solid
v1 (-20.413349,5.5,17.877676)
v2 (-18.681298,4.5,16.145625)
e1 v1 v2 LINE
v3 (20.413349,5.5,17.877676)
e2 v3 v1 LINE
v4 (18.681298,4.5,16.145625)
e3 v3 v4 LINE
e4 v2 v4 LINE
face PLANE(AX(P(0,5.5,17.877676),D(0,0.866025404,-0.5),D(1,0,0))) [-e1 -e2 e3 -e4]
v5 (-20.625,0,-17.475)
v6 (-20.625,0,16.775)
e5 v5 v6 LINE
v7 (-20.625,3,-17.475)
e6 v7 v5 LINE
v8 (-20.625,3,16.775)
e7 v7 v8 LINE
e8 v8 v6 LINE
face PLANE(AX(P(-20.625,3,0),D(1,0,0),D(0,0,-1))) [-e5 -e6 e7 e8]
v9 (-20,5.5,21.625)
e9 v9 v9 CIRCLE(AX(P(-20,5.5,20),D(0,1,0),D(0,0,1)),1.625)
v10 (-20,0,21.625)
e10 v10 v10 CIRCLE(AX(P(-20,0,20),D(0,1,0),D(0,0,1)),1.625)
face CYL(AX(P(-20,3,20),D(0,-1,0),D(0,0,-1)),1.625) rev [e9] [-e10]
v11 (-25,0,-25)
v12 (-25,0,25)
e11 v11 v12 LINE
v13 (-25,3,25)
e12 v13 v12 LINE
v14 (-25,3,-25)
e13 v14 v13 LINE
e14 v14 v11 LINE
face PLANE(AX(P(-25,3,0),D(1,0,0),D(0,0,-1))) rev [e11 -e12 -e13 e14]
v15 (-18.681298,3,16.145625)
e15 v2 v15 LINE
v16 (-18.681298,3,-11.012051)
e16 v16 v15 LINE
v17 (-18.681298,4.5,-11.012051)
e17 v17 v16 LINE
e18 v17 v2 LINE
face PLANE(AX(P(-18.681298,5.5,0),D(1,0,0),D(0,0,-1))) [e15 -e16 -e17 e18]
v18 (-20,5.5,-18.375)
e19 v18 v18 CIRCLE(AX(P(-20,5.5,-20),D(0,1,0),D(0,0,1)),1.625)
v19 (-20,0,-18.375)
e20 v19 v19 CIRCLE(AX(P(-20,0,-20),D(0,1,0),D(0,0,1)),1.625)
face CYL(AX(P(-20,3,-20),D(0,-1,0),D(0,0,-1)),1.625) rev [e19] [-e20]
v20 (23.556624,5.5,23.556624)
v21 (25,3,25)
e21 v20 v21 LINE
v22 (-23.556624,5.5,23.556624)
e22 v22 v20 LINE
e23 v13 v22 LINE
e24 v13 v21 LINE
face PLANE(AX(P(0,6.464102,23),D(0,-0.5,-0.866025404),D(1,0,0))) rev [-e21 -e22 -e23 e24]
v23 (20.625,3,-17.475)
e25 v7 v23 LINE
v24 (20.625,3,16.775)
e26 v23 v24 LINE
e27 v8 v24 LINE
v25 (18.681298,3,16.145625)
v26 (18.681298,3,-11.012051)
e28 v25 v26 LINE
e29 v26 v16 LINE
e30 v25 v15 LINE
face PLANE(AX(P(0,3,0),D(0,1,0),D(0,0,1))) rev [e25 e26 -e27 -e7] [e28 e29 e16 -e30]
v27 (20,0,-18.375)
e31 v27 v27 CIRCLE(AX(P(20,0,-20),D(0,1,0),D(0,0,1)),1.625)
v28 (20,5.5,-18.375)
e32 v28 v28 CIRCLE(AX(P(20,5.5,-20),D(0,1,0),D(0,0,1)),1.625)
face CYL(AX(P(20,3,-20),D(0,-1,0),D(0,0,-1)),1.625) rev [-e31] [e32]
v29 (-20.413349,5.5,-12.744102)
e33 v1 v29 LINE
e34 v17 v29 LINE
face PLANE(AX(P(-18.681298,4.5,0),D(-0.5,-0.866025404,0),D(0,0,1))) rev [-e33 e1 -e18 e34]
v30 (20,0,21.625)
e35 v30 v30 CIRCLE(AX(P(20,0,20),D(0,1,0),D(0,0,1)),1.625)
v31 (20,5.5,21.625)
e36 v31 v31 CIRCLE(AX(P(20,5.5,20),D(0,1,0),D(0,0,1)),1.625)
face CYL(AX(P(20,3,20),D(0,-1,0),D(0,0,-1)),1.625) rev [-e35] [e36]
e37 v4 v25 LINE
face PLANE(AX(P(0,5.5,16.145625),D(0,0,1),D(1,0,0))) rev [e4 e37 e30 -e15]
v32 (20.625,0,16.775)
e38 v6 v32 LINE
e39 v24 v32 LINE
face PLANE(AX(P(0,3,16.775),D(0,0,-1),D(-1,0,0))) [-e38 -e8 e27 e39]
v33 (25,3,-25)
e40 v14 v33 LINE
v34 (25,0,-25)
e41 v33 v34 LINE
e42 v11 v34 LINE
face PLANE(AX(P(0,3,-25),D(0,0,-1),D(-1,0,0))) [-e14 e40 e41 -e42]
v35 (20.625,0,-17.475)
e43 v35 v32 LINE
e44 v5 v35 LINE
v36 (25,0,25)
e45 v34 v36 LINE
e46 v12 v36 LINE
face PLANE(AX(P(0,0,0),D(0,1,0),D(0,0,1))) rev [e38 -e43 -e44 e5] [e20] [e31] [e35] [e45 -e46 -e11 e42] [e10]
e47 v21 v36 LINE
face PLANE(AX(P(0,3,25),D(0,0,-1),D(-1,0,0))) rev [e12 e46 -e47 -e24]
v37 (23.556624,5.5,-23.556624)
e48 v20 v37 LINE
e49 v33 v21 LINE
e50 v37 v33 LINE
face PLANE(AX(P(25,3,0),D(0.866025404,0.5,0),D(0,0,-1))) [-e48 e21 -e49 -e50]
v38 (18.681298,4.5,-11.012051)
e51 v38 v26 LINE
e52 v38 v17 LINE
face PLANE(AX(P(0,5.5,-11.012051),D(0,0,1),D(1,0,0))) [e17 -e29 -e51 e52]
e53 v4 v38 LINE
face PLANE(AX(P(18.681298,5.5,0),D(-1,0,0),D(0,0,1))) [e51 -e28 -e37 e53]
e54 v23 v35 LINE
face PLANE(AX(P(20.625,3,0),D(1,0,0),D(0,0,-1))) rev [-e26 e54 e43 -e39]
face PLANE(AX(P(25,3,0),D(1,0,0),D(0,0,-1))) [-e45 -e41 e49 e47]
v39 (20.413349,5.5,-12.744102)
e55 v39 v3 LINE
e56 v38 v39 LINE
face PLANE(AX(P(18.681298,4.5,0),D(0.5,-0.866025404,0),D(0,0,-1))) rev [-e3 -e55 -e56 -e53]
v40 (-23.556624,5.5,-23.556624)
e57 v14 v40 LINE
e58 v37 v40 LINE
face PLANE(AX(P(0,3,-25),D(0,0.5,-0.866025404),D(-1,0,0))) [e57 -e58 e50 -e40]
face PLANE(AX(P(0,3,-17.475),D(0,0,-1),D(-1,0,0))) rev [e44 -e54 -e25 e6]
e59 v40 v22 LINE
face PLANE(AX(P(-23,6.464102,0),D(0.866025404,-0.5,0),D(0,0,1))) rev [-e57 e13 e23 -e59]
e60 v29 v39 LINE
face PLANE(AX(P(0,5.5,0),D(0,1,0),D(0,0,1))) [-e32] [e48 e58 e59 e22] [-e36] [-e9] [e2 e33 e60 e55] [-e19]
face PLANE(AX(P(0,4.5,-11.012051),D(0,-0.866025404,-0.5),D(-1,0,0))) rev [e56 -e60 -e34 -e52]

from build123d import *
from OCP.BRepFilletAPI import BRepFilletAPI_MakeChamfer

# Parameters (mm, degrees)
SKETCH1_W           = 50
SKETCH1_H           = 50
SKETCH1_W_2         = 46
SKETCH1_H_2         = 46
SKETCH1_R           = 1.625
SKETCH1_W_3         = 41.25
SKETCH1_H_3         = 34.25
BOSS_EXTRUDE1_DEPTH = 3
BOSS_EXTRUDE2_START = 3
SKETCH1_3_W         = 46
SKETCH1_3_H         = 46
SKETCH1_3_R         = 1.625
SKETCH1_3_W_2       = 41.25
SKETCH1_3_H_2       = 34.25
SKETCH1_3_W_3       = 37.362596296
SKETCH1_3_H_3       = 27.15767644
BOSS_EXTRUDE2_DEPTH = 2.5
CHAMFER1_SIZE       = 2
CHAMFER1_SIZE_2     = 3.464101615
CHAMFER2_SIZE       = 1
CHAMFER2_SIZE2      = 1.732050808


with BuildPart() as part:
    # Sketch1 → Boss-Extrude1 (new body)
    # profile 1 of 2: a face of its own
    with BuildSketch(Plane(origin=(0, 0, 0), x_dir=(1, 0, 0), z_dir=(0, 1, 0))):
        Rectangle(SKETCH1_W, SKETCH1_H)
        Rectangle(SKETCH1_W_2, SKETCH1_H_2, mode=Mode.SUBTRACT)
    # profile 2 of 2: a face of its own
    with BuildSketch(Plane(origin=(0, 0, 0), x_dir=(1, 0, 0), z_dir=(0, 1, 0))):
        Rectangle(SKETCH1_W_2, SKETCH1_H_2)
        with Locations(Location((-20, -20, 0), (0, 0, 270))):
            Circle(SKETCH1_R, mode=Mode.SUBTRACT)
        with Locations(Location((20, -20, 0), (0, 0, 270))):
            Circle(SKETCH1_R, mode=Mode.SUBTRACT)
        with Locations(Location((20, 20, 0), (0, 0, 270))):
            Circle(SKETCH1_R, mode=Mode.SUBTRACT)
        with Locations(Location((-20, 20, 0), (0, 0, 270))):
            Circle(SKETCH1_R, mode=Mode.SUBTRACT)
        with Locations((0, 0.35)):
            Rectangle(SKETCH1_W_3, SKETCH1_H_3, mode=Mode.SUBTRACT)
    extrude(amount=BOSS_EXTRUDE1_DEPTH)

    # Sketch1<3> → Boss-Extrude2 (add)
    # profile 1 of 2: a face of its own
    with BuildSketch(Plane(origin=(0, 0, 0), x_dir=(1, 0, 0), z_dir=(0, 1, 0)).offset(BOSS_EXTRUDE2_START)):
        Rectangle(SKETCH1_3_W, SKETCH1_3_H)
        with Locations(Location((-20, -20, 0), (0, 0, 270))):
            Circle(SKETCH1_3_R, mode=Mode.SUBTRACT)
        with Locations(Location((20, -20, 0), (0, 0, 270))):
            Circle(SKETCH1_3_R, mode=Mode.SUBTRACT)
        with Locations(Location((20, 20, 0), (0, 0, 270))):
            Circle(SKETCH1_3_R, mode=Mode.SUBTRACT)
        with Locations(Location((-20, 20, 0), (0, 0, 270))):
            Circle(SKETCH1_3_R, mode=Mode.SUBTRACT)
        with Locations((0, 0.35)):
            Rectangle(SKETCH1_3_W_2, SKETCH1_3_H_2, mode=Mode.SUBTRACT)
    # profile 2 of 2: a face of its own
    with BuildSketch(Plane(origin=(0, 0, 0), x_dir=(1, 0, 0), z_dir=(0, 1, 0)).offset(BOSS_EXTRUDE2_START)):
        with Locations((0, 0.35)):
            Rectangle(SKETCH1_3_W_2, SKETCH1_3_H_2)
        with Locations((0, -2.566787067)):
            Rectangle(SKETCH1_3_W_3, SKETCH1_3_H_3, mode=Mode.SUBTRACT)
    extrude(amount=BOSS_EXTRUDE2_DEPTH)

    # Chamfer1
    # the kernel refuses this chamfer: 3.464101615, 2 mm, written as the material it adds along each edge
    with BuildSketch(Plane(origin=(-23, 3, -23), x_dir=(0, -0.05789386240267147, -0.9983227437537926), z_dir=(1, 0, 0))) as chamfer1_piece_1_section:
        Polygon((CHAMFER1_SIZE * 0.998322743754, CHAMFER1_SIZE * 0.0578938624027), (-CHAMFER1_SIZE_2 * 0.057893862405, CHAMFER1_SIZE_2 * 0.998322743793), (0, 0), align=None)
    chamfer1_piece_1 = extrude(amount=46, mode=Mode.PRIVATE)
    chamfer1_piece_1 = split(chamfer1_piece_1, bisect_by=Plane(origin=(0, 3.976343679, -25), z_dir=(0, 0, 1)), keep=Keep.TOP, mode=Mode.PRIVATE)
    chamfer1_piece_1 = split(chamfer1_piece_1, bisect_by=Plane(origin=(0, 5.5, -23.695570033), z_dir=(0, -1, 0)), keep=Keep.TOP, mode=Mode.PRIVATE)
    add(chamfer1_piece_1)
    with BuildSketch(Plane(origin=(-23, 3, 23), x_dir=(-0.9983227437537926, -0.05789386240267147, 0), z_dir=(0, 0, -1))) as chamfer1_piece_2_section:
        Polygon((CHAMFER1_SIZE * 0.998322743754, CHAMFER1_SIZE * 0.0578938624027), (-CHAMFER1_SIZE_2 * 0.057893862405, CHAMFER1_SIZE_2 * 0.998322743793), (0, 0), align=None)
    chamfer1_piece_2 = extrude(amount=46, mode=Mode.PRIVATE)
    chamfer1_piece_2 = split(chamfer1_piece_2, bisect_by=Plane(origin=(-25, 3.976343679, 0), z_dir=(1, 0, 0)), keep=Keep.TOP, mode=Mode.PRIVATE)
    chamfer1_piece_2 = split(chamfer1_piece_2, bisect_by=Plane(origin=(-23.695570033, 5.5, 0), z_dir=(0, -1, 0)), keep=Keep.TOP, mode=Mode.PRIVATE)
    add(chamfer1_piece_2)
    with BuildSketch(Plane(origin=(23, 3, 23), x_dir=(0, -0.05789386240267147, 0.9983227437537926), z_dir=(-1, 0, 0))) as chamfer1_piece_3_section:
        Polygon((CHAMFER1_SIZE * 0.998322743754, CHAMFER1_SIZE * 0.0578938624027), (-CHAMFER1_SIZE_2 * 0.057893862405, CHAMFER1_SIZE_2 * 0.998322743793), (0, 0), align=None)
    chamfer1_piece_3 = extrude(amount=46, mode=Mode.PRIVATE)
    chamfer1_piece_3 = split(chamfer1_piece_3, bisect_by=Plane(origin=(0, 3.976343679, 25), z_dir=(0, 0, -1)), keep=Keep.TOP, mode=Mode.PRIVATE)
    chamfer1_piece_3 = split(chamfer1_piece_3, bisect_by=Plane(origin=(0, 5.5, 23.695570033), z_dir=(0, -1, 0)), keep=Keep.TOP, mode=Mode.PRIVATE)
    add(chamfer1_piece_3)
    with BuildSketch(Plane(origin=(23, 3, -23), x_dir=(0.9983227437537926, -0.05789386240267147, 0), z_dir=(0, 0, 1))) as chamfer1_piece_4_section:
        Polygon((CHAMFER1_SIZE * 0.998322743754, CHAMFER1_SIZE * 0.0578938624027), (-CHAMFER1_SIZE_2 * 0.057893862405, CHAMFER1_SIZE_2 * 0.998322743793), (0, 0), align=None)
    chamfer1_piece_4 = extrude(amount=46, mode=Mode.PRIVATE)
    chamfer1_piece_4 = split(chamfer1_piece_4, bisect_by=Plane(origin=(25, 3.976343679, 0), z_dir=(-1, 0, 0)), keep=Keep.TOP, mode=Mode.PRIVATE)
    chamfer1_piece_4 = split(chamfer1_piece_4, bisect_by=Plane(origin=(23.695570033, 5.5, 0), z_dir=(0, -1, 0)), keep=Keep.TOP, mode=Mode.PRIVATE)
    add(chamfer1_piece_4)
    with BuildSketch(Plane(origin=(-23, 3, 23), x_dir=(-0.9983227437537926, -0.05789386240267147, 0), z_dir=(0, 0, -1))) as chamfer1_piece_5a_section:
        Polygon((CHAMFER1_SIZE * 0.998322743754, CHAMFER1_SIZE * 0.0578938624027), (-CHAMFER1_SIZE_2 * 0.057893862405, CHAMFER1_SIZE_2 * 0.998322743793), (0, 0), align=None)
    chamfer1_piece_5a = extrude(amount=54.961927941, mode=Mode.PRIVATE)
    chamfer1_piece_5a = split(chamfer1_piece_5a, bisect_by=Plane(origin=(-23.695570033, 3.976343679, -25), z_dir=(0, 0, 1)), keep=Keep.TOP, mode=Mode.PRIVATE)
    chamfer1_piece_5a = split(chamfer1_piece_5a, bisect_by=Plane(origin=(-25, 3.976343679, -24), z_dir=(1, 0, 0)), keep=Keep.TOP, mode=Mode.PRIVATE)
    chamfer1_piece_5a = split(chamfer1_piece_5a, bisect_by=Plane(origin=(-23.695570033, 3.976343679, -23), z_dir=(0, 0, -1)), keep=Keep.TOP, mode=Mode.PRIVATE)
    chamfer1_piece_5a = split(chamfer1_piece_5a, bisect_by=Plane(origin=(-23.695570033, 5.5, -24), z_dir=(0, -1, 0)), keep=Keep.TOP, mode=Mode.PRIVATE)
    with BuildSketch(Plane(origin=(-31.961927941, 3, -23), x_dir=(0, -0.05789386240267147, -0.9983227437537926), z_dir=(1, 0, 0))) as chamfer1_piece_5b_section:
        Polygon((CHAMFER1_SIZE * 0.998322743754, CHAMFER1_SIZE * 0.0578938624027), (-CHAMFER1_SIZE_2 * 0.057893862405, CHAMFER1_SIZE_2 * 0.998322743793), (0, 0), align=None)
    chamfer1_piece_5b = extrude(amount=54.961927941, mode=Mode.PRIVATE)
    chamfer1_piece_5b = split(chamfer1_piece_5b, bisect_by=Plane(origin=(-24, 3.976343679, -25), z_dir=(0, 0, 1)), keep=Keep.TOP, mode=Mode.PRIVATE)
    chamfer1_piece_5b = split(chamfer1_piece_5b, bisect_by=Plane(origin=(-25, 3.976343679, -23.695570033), z_dir=(1, 0, 0)), keep=Keep.TOP, mode=Mode.PRIVATE)
    chamfer1_piece_5b = split(chamfer1_piece_5b, bisect_by=Plane(origin=(-23, 3.976343679, -23.695570033), z_dir=(-1, 0, 0)), keep=Keep.TOP, mode=Mode.PRIVATE)
    chamfer1_piece_5b = split(chamfer1_piece_5b, bisect_by=Plane(origin=(-24, 5.5, -23.695570033), z_dir=(0, -1, 0)), keep=Keep.TOP, mode=Mode.PRIVATE)
    chamfer1_piece_5 = chamfer1_piece_5a & chamfer1_piece_5b
    add(chamfer1_piece_5)
    with BuildSketch(Plane(origin=(23, 3, -31.961927941), x_dir=(0.9983227437537926, -0.05789386240267147, 0), z_dir=(0, 0, 1))) as chamfer1_piece_6a_section:
        Polygon((CHAMFER1_SIZE * 0.998322743754, CHAMFER1_SIZE * 0.0578938624027), (-CHAMFER1_SIZE_2 * 0.057893862405, CHAMFER1_SIZE_2 * 0.998322743793), (0, 0), align=None)
    chamfer1_piece_6a = extrude(amount=54.961927941, mode=Mode.PRIVATE)
    chamfer1_piece_6a = split(chamfer1_piece_6a, bisect_by=Plane(origin=(25, 3.976343679, -24), z_dir=(-1, 0, 0)), keep=Keep.TOP, mode=Mode.PRIVATE)
    chamfer1_piece_6a = split(chamfer1_piece_6a, bisect_by=Plane(origin=(23.695570033, 3.976343679, -25), z_dir=(0, 0, 1)), keep=Keep.TOP, mode=Mode.PRIVATE)
    chamfer1_piece_6a = split(chamfer1_piece_6a, bisect_by=Plane(origin=(23.695570033, 3.976343679, -23), z_dir=(0, 0, -1)), keep=Keep.TOP, mode=Mode.PRIVATE)
    chamfer1_piece_6a = split(chamfer1_piece_6a, bisect_by=Plane(origin=(23.695570033, 5.5, -24), z_dir=(0, -1, 0)), keep=Keep.TOP, mode=Mode.PRIVATE)
    with BuildSketch(Plane(origin=(-23, 3, -23), x_dir=(0, -0.05789386240267147, -0.9983227437537926), z_dir=(1, 0, 0))) as chamfer1_piece_6b_section:
        Polygon((CHAMFER1_SIZE * 0.998322743754, CHAMFER1_SIZE * 0.0578938624027), (-CHAMFER1_SIZE_2 * 0.057893862405, CHAMFER1_SIZE_2 * 0.998322743793), (0, 0), align=None)
    chamfer1_piece_6b = extrude(amount=54.961927941, mode=Mode.PRIVATE)
    chamfer1_piece_6b = split(chamfer1_piece_6b, bisect_by=Plane(origin=(25, 3.976343679, -23.695570033), z_dir=(-1, 0, 0)), keep=Keep.TOP, mode=Mode.PRIVATE)
    chamfer1_piece_6b = split(chamfer1_piece_6b, bisect_by=Plane(origin=(24, 3.976343679, -25), z_dir=(0, 0, 1)), keep=Keep.TOP, mode=Mode.PRIVATE)
    chamfer1_piece_6b = split(chamfer1_piece_6b, bisect_by=Plane(origin=(23, 3.976343679, -23.695570033), z_dir=(1, 0, 0)), keep=Keep.TOP, mode=Mode.PRIVATE)
    chamfer1_piece_6b = split(chamfer1_piece_6b, bisect_by=Plane(origin=(24, 5.5, -23.695570033), z_dir=(0, -1, 0)), keep=Keep.TOP, mode=Mode.PRIVATE)
    chamfer1_piece_6 = chamfer1_piece_6a & chamfer1_piece_6b
    add(chamfer1_piece_6)
    with BuildSketch(Plane(origin=(23, 3, 23), x_dir=(0, -0.05789386240267147, 0.9983227437537926), z_dir=(-1, 0, 0))) as chamfer1_piece_7a_section:
        Polygon((CHAMFER1_SIZE * 0.998322743754, CHAMFER1_SIZE * 0.0578938624027), (-CHAMFER1_SIZE_2 * 0.057893862405, CHAMFER1_SIZE_2 * 0.998322743793), (0, 0), align=None)
    chamfer1_piece_7a = extrude(amount=54.961927941, mode=Mode.PRIVATE)
    chamfer1_piece_7a = split(chamfer1_piece_7a, bisect_by=Plane(origin=(-24, 3.976343679, 25), z_dir=(0, 0, -1)), keep=Keep.TOP, mode=Mode.PRIVATE)
    chamfer1_piece_7a = split(chamfer1_piece_7a, bisect_by=Plane(origin=(-25, 3.976343679, 23.695570033), z_dir=(1, 0, 0)), keep=Keep.TOP, mode=Mode.PRIVATE)
    chamfer1_piece_7a = split(chamfer1_piece_7a, bisect_by=Plane(origin=(-24, 5.5, 23.695570033), z_dir=(0, -1, 0)), keep=Keep.TOP, mode=Mode.PRIVATE)
    chamfer1_piece_7a = split(chamfer1_piece_7a, bisect_by=Plane(origin=(-23, 3.976343679, 23.695570033), z_dir=(-1, 0, 0)), keep=Keep.TOP, mode=Mode.PRIVATE)
    with BuildSketch(Plane(origin=(-23, 3, 31.961927941), x_dir=(-0.9983227437537926, -0.05789386240267147, 0), z_dir=(0, 0, -1))) as chamfer1_piece_7b_section:
        Polygon((CHAMFER1_SIZE * 0.998322743754, CHAMFER1_SIZE * 0.0578938624027), (-CHAMFER1_SIZE_2 * 0.057893862405, CHAMFER1_SIZE_2 * 0.998322743793), (0, 0), align=None)
    chamfer1_piece_7b = extrude(amount=54.961927941, mode=Mode.PRIVATE)
    chamfer1_piece_7b = split(chamfer1_piece_7b, bisect_by=Plane(origin=(-23.695570033, 3.976343679, 25), z_dir=(0, 0, -1)), keep=Keep.TOP, mode=Mode.PRIVATE)
    chamfer1_piece_7b = split(chamfer1_piece_7b, bisect_by=Plane(origin=(-25, 3.976343679, 24), z_dir=(1, 0, 0)), keep=Keep.TOP, mode=Mode.PRIVATE)
    chamfer1_piece_7b = split(chamfer1_piece_7b, bisect_by=Plane(origin=(-23.695570033, 5.5, 24), z_dir=(0, -1, 0)), keep=Keep.TOP, mode=Mode.PRIVATE)
    chamfer1_piece_7b = split(chamfer1_piece_7b, bisect_by=Plane(origin=(-23.695570033, 3.976343679, 23), z_dir=(0, 0, 1)), keep=Keep.TOP, mode=Mode.PRIVATE)
    chamfer1_piece_7 = chamfer1_piece_7a & chamfer1_piece_7b
    add(chamfer1_piece_7)
    with BuildSketch(Plane(origin=(23, 3, -23), x_dir=(0.9983227437537926, -0.05789386240267147, 0), z_dir=(0, 0, 1))) as chamfer1_piece_8a_section:
        Polygon((CHAMFER1_SIZE * 0.998322743754, CHAMFER1_SIZE * 0.0578938624027), (-CHAMFER1_SIZE_2 * 0.057893862405, CHAMFER1_SIZE_2 * 0.998322743793), (0, 0), align=None)
    chamfer1_piece_8a = extrude(amount=54.961927941, mode=Mode.PRIVATE)
    chamfer1_piece_8a = split(chamfer1_piece_8a, bisect_by=Plane(origin=(25, 3.976343679, 24), z_dir=(-1, 0, 0)), keep=Keep.TOP, mode=Mode.PRIVATE)
    chamfer1_piece_8a = split(chamfer1_piece_8a, bisect_by=Plane(origin=(23.695570033, 3.976343679, 25), z_dir=(0, 0, -1)), keep=Keep.TOP, mode=Mode.PRIVATE)
    chamfer1_piece_8a = split(chamfer1_piece_8a, bisect_by=Plane(origin=(23.695570033, 5.5, 24), z_dir=(0, -1, 0)), keep=Keep.TOP, mode=Mode.PRIVATE)
    chamfer1_piece_8a = split(chamfer1_piece_8a, bisect_by=Plane(origin=(23.695570033, 3.976343679, 23), z_dir=(0, 0, 1)), keep=Keep.TOP, mode=Mode.PRIVATE)
    with BuildSketch(Plane(origin=(31.961927941, 3, 23), x_dir=(0, -0.05789386240267147, 0.9983227437537926), z_dir=(-1, 0, 0))) as chamfer1_piece_8b_section:
        Polygon((CHAMFER1_SIZE * 0.998322743754, CHAMFER1_SIZE * 0.0578938624027), (-CHAMFER1_SIZE_2 * 0.057893862405, CHAMFER1_SIZE_2 * 0.998322743793), (0, 0), align=None)
    chamfer1_piece_8b = extrude(amount=54.961927941, mode=Mode.PRIVATE)
    chamfer1_piece_8b = split(chamfer1_piece_8b, bisect_by=Plane(origin=(25, 3.976343679, 23.695570033), z_dir=(-1, 0, 0)), keep=Keep.TOP, mode=Mode.PRIVATE)
    chamfer1_piece_8b = split(chamfer1_piece_8b, bisect_by=Plane(origin=(24, 3.976343679, 25), z_dir=(0, 0, -1)), keep=Keep.TOP, mode=Mode.PRIVATE)
    chamfer1_piece_8b = split(chamfer1_piece_8b, bisect_by=Plane(origin=(24, 5.5, 23.695570033), z_dir=(0, -1, 0)), keep=Keep.TOP, mode=Mode.PRIVATE)
    chamfer1_piece_8b = split(chamfer1_piece_8b, bisect_by=Plane(origin=(23, 3.976343679, 23.695570033), z_dir=(1, 0, 0)), keep=Keep.TOP, mode=Mode.PRIVATE)
    chamfer1_piece_8 = chamfer1_piece_8a & chamfer1_piece_8b
    add(chamfer1_piece_8)

    # Chamfer2: one chamfer whose edges measure the first distance from different faces: ONE call of the kernel's chamfer builder (chamfer() names one face for all edges)
    chamfer2_edges_1 = [part.edges().sort_by_distance(p)[0] for p in [
        (-18.681298148, 5.5, 2.566787067),
    ]]
    chamfer2_side_1 = [part.faces().sort_by_distance(p)[0] for p in [
        (-18.681298148, 4.25, 2.566787067),
    ]]
    chamfer2_edges_2 = [part.edges().sort_by_distance(p)[0] for p in [
        (0, 5.5, -11.012051153),
    ]]
    chamfer2_side_2 = [part.faces().sort_by_distance(p)[0] for p in [
        (0, 4.25, -11.012051153),
    ]]
    chamfer2_edges_3 = [part.edges().sort_by_distance(p)[0] for p in [
        (18.681298148, 5.5, 2.566787067),
    ]]
    chamfer2_side_3 = [part.faces().sort_by_distance(p)[0] for p in [
        (18.681298148, 4.25, 2.566787067),
    ]]
    chamfer2_edges_4 = [part.edges().sort_by_distance(p)[0] for p in [
        (0, 5.5, 16.145625287),
    ]]
    chamfer2_side_4 = [part.faces().sort_by_distance(p)[0] for p in [
        (0, 4.25, 16.145625287),
    ]]
    chamfer2 = BRepFilletAPI_MakeChamfer(part.part.solid().wrapped)
    for e in chamfer2_edges_1:
        chamfer2.Add(CHAMFER2_SIZE, CHAMFER2_SIZE2, e.wrapped, chamfer2_side_1[0].wrapped)  # the first distance lies on this face
    for e in chamfer2_edges_2:
        chamfer2.Add(CHAMFER2_SIZE, CHAMFER2_SIZE2, e.wrapped, chamfer2_side_2[0].wrapped)  # the first distance lies on this face
    for e in chamfer2_edges_3:
        chamfer2.Add(CHAMFER2_SIZE, CHAMFER2_SIZE2, e.wrapped, chamfer2_side_3[0].wrapped)  # the first distance lies on this face
    for e in chamfer2_edges_4:
        chamfer2.Add(CHAMFER2_SIZE, CHAMFER2_SIZE2, e.wrapped, chamfer2_side_4[0].wrapped)  # the first distance lies on this face
    add(Compound.cast(chamfer2.Shape()), mode=Mode.REPLACE)


solid = part.part
